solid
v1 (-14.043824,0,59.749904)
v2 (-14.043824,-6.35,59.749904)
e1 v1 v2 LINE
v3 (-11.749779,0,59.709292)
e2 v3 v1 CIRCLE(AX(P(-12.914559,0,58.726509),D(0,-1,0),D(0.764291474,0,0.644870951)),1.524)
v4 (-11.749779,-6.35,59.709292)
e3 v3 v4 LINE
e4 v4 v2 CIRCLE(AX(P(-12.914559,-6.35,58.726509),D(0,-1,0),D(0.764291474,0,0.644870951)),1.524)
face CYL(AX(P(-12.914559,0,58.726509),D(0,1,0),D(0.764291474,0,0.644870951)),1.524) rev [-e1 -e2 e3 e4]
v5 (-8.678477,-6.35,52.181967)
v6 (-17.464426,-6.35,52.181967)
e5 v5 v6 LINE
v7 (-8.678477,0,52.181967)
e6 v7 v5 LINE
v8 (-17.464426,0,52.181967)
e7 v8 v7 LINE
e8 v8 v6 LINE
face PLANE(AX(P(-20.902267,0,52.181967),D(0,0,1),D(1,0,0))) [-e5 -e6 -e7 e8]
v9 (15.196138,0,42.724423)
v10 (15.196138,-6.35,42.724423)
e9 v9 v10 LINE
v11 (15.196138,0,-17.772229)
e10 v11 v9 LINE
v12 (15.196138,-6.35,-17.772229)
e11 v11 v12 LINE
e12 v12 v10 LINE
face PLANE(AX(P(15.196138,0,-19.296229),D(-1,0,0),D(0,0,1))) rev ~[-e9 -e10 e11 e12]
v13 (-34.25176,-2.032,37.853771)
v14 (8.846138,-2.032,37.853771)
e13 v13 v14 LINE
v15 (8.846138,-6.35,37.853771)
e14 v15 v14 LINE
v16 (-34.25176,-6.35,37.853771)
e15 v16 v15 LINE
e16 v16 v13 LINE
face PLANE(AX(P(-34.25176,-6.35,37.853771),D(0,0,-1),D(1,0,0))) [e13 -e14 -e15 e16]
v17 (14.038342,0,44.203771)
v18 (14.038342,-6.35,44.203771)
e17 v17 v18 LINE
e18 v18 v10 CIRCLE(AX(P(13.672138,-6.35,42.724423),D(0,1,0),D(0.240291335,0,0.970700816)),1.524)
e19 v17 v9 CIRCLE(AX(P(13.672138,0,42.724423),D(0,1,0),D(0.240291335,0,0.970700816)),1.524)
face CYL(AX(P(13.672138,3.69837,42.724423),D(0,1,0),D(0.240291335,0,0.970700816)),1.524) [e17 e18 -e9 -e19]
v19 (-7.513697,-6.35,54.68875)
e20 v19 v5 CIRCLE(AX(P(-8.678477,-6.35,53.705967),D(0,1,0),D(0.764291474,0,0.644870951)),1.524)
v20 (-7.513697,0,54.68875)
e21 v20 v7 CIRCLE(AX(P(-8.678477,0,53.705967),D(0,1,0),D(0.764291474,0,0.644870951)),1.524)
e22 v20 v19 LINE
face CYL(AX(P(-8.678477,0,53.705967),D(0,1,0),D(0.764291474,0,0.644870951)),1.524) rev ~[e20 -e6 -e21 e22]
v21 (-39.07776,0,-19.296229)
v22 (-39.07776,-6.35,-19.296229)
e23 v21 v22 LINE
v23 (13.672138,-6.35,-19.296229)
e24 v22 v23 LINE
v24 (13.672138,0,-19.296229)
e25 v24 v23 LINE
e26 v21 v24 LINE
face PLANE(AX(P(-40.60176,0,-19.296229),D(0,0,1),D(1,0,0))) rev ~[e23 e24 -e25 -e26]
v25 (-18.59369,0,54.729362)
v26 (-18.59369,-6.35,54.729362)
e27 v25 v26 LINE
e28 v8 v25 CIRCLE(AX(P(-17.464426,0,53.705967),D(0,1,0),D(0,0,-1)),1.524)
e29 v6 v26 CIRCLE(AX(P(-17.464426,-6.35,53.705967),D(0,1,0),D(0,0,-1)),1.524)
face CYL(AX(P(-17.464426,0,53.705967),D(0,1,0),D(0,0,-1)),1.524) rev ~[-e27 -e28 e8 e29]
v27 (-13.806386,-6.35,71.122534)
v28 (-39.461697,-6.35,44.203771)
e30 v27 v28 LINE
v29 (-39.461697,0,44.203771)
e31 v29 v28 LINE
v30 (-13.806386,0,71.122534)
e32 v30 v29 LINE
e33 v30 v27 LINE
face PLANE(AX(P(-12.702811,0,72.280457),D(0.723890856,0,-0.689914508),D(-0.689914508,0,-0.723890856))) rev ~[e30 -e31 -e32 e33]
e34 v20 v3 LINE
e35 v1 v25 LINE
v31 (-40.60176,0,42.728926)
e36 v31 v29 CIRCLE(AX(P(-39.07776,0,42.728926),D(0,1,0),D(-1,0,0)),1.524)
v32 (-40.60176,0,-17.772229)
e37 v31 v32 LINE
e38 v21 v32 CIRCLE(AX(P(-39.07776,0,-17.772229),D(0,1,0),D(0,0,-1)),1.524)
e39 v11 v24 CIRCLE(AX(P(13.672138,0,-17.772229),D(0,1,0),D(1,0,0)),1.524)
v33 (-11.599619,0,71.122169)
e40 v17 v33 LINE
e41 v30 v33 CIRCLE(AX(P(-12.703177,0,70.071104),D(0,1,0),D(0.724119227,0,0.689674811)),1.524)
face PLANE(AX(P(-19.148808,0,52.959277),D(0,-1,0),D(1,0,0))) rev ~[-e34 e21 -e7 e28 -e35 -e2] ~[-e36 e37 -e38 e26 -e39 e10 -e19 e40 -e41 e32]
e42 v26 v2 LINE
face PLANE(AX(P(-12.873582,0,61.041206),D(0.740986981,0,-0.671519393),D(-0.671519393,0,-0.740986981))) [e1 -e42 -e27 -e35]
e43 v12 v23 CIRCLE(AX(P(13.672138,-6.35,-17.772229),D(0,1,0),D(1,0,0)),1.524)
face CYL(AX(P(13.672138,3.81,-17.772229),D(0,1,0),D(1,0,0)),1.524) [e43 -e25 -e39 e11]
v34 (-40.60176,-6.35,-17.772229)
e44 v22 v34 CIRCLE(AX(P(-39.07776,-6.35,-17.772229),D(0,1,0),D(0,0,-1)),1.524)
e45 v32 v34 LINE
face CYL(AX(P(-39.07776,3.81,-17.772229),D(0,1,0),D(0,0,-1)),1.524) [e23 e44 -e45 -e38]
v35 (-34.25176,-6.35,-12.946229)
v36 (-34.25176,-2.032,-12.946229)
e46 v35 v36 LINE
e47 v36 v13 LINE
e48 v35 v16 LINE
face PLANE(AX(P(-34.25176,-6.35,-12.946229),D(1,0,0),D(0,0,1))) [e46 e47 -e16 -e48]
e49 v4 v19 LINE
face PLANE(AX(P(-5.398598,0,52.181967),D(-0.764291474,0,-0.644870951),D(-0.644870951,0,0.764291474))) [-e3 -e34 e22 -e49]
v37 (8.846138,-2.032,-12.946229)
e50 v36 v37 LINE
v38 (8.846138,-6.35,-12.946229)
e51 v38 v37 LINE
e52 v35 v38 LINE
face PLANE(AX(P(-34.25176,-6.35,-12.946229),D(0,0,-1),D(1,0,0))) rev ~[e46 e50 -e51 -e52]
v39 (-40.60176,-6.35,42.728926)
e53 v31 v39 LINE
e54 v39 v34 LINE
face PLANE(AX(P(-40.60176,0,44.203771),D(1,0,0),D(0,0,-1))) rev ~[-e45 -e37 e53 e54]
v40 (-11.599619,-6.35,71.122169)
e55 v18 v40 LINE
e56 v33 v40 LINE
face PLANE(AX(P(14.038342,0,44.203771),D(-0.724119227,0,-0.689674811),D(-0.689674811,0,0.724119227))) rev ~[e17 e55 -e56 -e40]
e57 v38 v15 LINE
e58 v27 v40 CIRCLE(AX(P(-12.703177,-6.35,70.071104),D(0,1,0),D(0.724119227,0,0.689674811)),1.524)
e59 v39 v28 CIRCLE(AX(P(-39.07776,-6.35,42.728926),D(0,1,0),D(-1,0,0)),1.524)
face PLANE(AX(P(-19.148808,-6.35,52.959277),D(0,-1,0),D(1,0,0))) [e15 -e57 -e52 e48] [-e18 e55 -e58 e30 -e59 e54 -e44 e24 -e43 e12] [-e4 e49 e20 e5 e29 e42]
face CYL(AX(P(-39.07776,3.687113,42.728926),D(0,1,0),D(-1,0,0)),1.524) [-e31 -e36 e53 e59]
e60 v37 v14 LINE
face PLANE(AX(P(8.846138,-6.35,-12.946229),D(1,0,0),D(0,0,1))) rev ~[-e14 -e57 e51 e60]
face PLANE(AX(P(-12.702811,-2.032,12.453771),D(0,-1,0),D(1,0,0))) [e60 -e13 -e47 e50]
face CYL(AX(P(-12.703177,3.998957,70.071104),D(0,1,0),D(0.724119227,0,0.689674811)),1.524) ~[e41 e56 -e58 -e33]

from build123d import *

# Parameters (mm, degrees)
F1_DEPTH     = 6.35
F2_W         = 43.0978981023
F2_H         = 50.8
F3_DEPTH     = 4.318
F5_DEPTH     = 6.35
F7_DEPTH     = 6.351
F8_T1_DEPTH  = 6.35
F8_T3_DEPTH  = 6.35
F8_T5_DEPTH  = 6.35
F8_T7_DEPTH  = 13.7467402192
F8_T9_DEPTH  = 14.3479140779
F8_T11_DEPTH = 13.97
F8_T13_DEPTH = 13.97
F8_T15_DEPTH = 13.724225926


# Not quite as in the source:
# - a fillet or chamfer that OpenCascade refuses, or shapes differently, is made with other operations: its cross-section is extruded or revolved along the edge and cut away or added


with BuildPart() as f1:
    # F0 (on Front) → F1 (new body)
    with BuildSketch(Plane.XZ):
        Polygon((-40.601760045, 44.2037712147), (-40.601760045, 20.0136204353), (-40.601760045, -19.2962287853), (-31.9894673416, -19.2962287853), (6.5923849878, -19.2962287853), (15.1961380572, -19.2962287853), (15.1961380572, 20.0136204353), (15.1961380572, 44.2037712147), align=None)
    extrude(amount=F1_DEPTH)

    # F2 (on face) → F3 (cut, through all)
    with BuildSketch(Plane.XZ.offset(6.35)):
        with Locations((-12.7028109939, 12.4537712147)):
            Rectangle(F2_W, F2_H)
    extrude(amount=-F3_DEPTH, mode=Mode.SUBTRACT)

    # F4 (on Front) → F5 (join, through all)
    with BuildSketch(Plane.XZ):
        Polygon((-12.7028109939, 72.2804571797), (-39.4616971228, 44.2037712147), (14.0383420512, 44.2037712147), align=None)
    extrude(amount=F5_DEPTH)

    # F6 (on Front) → F7 (cut, through all)
    with BuildSketch(Plane.XZ):
        Polygon((-5.3985980339, 52.1819666028), (-12.8735816106, 61.0412061214), (-20.9022667259, 52.1819666028), align=None)
    extrude(amount=F7_DEPTH, mode=Mode.SUBTRACT)

    # F8: fillet of radius 1.524 on 8 edges, made by hand

    # F8_s2 → F8_t1 (join)
    with BuildSketch(Plane.XZ):
        with BuildLine():
            ThreePointArc((-11.7497792539, 59.7092922586), (-12.8875838111, 60.2502701687), (-14.0438236179, 59.7499044838))
            Line((-14.0438236179, 59.7499044838), (-12.8735816106, 61.0412061214))
            Line((-12.8735816106, 61.0412061214), (-11.7497792539, 59.7092922586))
        make_face()
    extrude(amount=F8_T1_DEPTH)

    # F8_s4 → F8_t3 (join)
    with BuildSketch(Plane.XZ):
        with BuildLine():
            ThreePointArc((-7.5136965339, 54.688749932), (-7.2963881401, 53.0637772981), (-8.6784767396, 52.1819666028))
            Line((-8.6784767396, 52.1819666028), (-5.3985980339, 52.1819666028))
            Line((-5.3985980339, 52.1819666028), (-7.5136965339, 54.688749932))
        make_face()
    extrude(amount=F8_T3_DEPTH)

    # F8_s6 → F8_t5 (join)
    with BuildSketch(Plane.XZ):
        with BuildLine():
            ThreePointArc((-17.4644255473, 52.1819666028), (-18.8576647272, 53.0883416458), (-18.5936897056, 54.7293621572))
            Line((-18.5936897056, 54.7293621572), (-20.9022667259, 52.1819666028))
            Line((-20.9022667259, 52.1819666028), (-17.4644255473, 52.1819666028))
        make_face()
    extrude(amount=F8_T5_DEPTH)

    # F8_s8 → F8_t7 (cut)
    with BuildSketch(Plane.XZ.offset(-3.6983701096)):
        with BuildLine():
            ThreePointArc((14.0383420512, 44.2037712147), (14.8722778172, 43.6636997843), (15.1961380572, 42.7244231708))
            Line((15.1961380572, 42.7244231708), (15.1961380572, 44.2037712147))
            Line((15.1961380572, 44.2037712147), (14.0383420512, 44.2037712147))
        make_face()
    extrude(amount=F8_T7_DEPTH, mode=Mode.SUBTRACT)

    # F8_s10 → F8_t9 (cut)
    with BuildSketch(Plane.XZ.offset(-3.9989570389)):
        with BuildLine():
            ThreePointArc((-11.5996190182, 71.1221685073), (-12.7029244443, 71.5951040748), (-13.8063863853, 71.122533806))
            Line((-13.8063863853, 71.122533806), (-12.7028109939, 72.2804571797))
            Line((-12.7028109939, 72.2804571797), (-11.5996190182, 71.1221685073))
        make_face()
    extrude(amount=F8_T9_DEPTH, mode=Mode.SUBTRACT)

    # F8_s12 → F8_t11 (cut)
    with BuildSketch(Plane.XZ.offset(-3.81)):
        with BuildLine():
            ThreePointArc((15.1961380572, -17.7722287853), (14.7497687918, -18.8498595199), (13.6721380572, -19.2962287853))
            Line((13.6721380572, -19.2962287853), (15.1961380572, -19.2962287853))
            Line((15.1961380572, -19.2962287853), (15.1961380572, -17.7722287853))
        make_face()
    extrude(amount=F8_T11_DEPTH, mode=Mode.SUBTRACT)

    # F8_s14 → F8_t13 (cut)
    with BuildSketch(Plane.XZ.offset(-3.81)):
        with BuildLine():
            ThreePointArc((-39.077760045, -19.2962287853), (-40.1553907795, -18.8498595199), (-40.601760045, -17.7722287853))
            Line((-40.601760045, -17.7722287853), (-40.601760045, -19.2962287853))
            Line((-40.601760045, -19.2962287853), (-39.077760045, -19.2962287853))
        make_face()
    extrude(amount=F8_T13_DEPTH, mode=Mode.SUBTRACT)

    # F8_s16 → F8_t15 (cut)
    with BuildSketch(Plane.XZ.offset(-3.687112963)):
        with BuildLine():
            ThreePointArc((-40.601760045, 42.7289260295), (-40.2835162614, 43.6609817932), (-39.4616971228, 44.2037712147))
            Line((-39.4616971228, 44.2037712147), (-40.601760045, 44.2037712147))
            Line((-40.601760045, 44.2037712147), (-40.601760045, 42.7289260295))
        make_face()
    extrude(amount=F8_T15_DEPTH, mode=Mode.SUBTRACT)


solid = f1.part
